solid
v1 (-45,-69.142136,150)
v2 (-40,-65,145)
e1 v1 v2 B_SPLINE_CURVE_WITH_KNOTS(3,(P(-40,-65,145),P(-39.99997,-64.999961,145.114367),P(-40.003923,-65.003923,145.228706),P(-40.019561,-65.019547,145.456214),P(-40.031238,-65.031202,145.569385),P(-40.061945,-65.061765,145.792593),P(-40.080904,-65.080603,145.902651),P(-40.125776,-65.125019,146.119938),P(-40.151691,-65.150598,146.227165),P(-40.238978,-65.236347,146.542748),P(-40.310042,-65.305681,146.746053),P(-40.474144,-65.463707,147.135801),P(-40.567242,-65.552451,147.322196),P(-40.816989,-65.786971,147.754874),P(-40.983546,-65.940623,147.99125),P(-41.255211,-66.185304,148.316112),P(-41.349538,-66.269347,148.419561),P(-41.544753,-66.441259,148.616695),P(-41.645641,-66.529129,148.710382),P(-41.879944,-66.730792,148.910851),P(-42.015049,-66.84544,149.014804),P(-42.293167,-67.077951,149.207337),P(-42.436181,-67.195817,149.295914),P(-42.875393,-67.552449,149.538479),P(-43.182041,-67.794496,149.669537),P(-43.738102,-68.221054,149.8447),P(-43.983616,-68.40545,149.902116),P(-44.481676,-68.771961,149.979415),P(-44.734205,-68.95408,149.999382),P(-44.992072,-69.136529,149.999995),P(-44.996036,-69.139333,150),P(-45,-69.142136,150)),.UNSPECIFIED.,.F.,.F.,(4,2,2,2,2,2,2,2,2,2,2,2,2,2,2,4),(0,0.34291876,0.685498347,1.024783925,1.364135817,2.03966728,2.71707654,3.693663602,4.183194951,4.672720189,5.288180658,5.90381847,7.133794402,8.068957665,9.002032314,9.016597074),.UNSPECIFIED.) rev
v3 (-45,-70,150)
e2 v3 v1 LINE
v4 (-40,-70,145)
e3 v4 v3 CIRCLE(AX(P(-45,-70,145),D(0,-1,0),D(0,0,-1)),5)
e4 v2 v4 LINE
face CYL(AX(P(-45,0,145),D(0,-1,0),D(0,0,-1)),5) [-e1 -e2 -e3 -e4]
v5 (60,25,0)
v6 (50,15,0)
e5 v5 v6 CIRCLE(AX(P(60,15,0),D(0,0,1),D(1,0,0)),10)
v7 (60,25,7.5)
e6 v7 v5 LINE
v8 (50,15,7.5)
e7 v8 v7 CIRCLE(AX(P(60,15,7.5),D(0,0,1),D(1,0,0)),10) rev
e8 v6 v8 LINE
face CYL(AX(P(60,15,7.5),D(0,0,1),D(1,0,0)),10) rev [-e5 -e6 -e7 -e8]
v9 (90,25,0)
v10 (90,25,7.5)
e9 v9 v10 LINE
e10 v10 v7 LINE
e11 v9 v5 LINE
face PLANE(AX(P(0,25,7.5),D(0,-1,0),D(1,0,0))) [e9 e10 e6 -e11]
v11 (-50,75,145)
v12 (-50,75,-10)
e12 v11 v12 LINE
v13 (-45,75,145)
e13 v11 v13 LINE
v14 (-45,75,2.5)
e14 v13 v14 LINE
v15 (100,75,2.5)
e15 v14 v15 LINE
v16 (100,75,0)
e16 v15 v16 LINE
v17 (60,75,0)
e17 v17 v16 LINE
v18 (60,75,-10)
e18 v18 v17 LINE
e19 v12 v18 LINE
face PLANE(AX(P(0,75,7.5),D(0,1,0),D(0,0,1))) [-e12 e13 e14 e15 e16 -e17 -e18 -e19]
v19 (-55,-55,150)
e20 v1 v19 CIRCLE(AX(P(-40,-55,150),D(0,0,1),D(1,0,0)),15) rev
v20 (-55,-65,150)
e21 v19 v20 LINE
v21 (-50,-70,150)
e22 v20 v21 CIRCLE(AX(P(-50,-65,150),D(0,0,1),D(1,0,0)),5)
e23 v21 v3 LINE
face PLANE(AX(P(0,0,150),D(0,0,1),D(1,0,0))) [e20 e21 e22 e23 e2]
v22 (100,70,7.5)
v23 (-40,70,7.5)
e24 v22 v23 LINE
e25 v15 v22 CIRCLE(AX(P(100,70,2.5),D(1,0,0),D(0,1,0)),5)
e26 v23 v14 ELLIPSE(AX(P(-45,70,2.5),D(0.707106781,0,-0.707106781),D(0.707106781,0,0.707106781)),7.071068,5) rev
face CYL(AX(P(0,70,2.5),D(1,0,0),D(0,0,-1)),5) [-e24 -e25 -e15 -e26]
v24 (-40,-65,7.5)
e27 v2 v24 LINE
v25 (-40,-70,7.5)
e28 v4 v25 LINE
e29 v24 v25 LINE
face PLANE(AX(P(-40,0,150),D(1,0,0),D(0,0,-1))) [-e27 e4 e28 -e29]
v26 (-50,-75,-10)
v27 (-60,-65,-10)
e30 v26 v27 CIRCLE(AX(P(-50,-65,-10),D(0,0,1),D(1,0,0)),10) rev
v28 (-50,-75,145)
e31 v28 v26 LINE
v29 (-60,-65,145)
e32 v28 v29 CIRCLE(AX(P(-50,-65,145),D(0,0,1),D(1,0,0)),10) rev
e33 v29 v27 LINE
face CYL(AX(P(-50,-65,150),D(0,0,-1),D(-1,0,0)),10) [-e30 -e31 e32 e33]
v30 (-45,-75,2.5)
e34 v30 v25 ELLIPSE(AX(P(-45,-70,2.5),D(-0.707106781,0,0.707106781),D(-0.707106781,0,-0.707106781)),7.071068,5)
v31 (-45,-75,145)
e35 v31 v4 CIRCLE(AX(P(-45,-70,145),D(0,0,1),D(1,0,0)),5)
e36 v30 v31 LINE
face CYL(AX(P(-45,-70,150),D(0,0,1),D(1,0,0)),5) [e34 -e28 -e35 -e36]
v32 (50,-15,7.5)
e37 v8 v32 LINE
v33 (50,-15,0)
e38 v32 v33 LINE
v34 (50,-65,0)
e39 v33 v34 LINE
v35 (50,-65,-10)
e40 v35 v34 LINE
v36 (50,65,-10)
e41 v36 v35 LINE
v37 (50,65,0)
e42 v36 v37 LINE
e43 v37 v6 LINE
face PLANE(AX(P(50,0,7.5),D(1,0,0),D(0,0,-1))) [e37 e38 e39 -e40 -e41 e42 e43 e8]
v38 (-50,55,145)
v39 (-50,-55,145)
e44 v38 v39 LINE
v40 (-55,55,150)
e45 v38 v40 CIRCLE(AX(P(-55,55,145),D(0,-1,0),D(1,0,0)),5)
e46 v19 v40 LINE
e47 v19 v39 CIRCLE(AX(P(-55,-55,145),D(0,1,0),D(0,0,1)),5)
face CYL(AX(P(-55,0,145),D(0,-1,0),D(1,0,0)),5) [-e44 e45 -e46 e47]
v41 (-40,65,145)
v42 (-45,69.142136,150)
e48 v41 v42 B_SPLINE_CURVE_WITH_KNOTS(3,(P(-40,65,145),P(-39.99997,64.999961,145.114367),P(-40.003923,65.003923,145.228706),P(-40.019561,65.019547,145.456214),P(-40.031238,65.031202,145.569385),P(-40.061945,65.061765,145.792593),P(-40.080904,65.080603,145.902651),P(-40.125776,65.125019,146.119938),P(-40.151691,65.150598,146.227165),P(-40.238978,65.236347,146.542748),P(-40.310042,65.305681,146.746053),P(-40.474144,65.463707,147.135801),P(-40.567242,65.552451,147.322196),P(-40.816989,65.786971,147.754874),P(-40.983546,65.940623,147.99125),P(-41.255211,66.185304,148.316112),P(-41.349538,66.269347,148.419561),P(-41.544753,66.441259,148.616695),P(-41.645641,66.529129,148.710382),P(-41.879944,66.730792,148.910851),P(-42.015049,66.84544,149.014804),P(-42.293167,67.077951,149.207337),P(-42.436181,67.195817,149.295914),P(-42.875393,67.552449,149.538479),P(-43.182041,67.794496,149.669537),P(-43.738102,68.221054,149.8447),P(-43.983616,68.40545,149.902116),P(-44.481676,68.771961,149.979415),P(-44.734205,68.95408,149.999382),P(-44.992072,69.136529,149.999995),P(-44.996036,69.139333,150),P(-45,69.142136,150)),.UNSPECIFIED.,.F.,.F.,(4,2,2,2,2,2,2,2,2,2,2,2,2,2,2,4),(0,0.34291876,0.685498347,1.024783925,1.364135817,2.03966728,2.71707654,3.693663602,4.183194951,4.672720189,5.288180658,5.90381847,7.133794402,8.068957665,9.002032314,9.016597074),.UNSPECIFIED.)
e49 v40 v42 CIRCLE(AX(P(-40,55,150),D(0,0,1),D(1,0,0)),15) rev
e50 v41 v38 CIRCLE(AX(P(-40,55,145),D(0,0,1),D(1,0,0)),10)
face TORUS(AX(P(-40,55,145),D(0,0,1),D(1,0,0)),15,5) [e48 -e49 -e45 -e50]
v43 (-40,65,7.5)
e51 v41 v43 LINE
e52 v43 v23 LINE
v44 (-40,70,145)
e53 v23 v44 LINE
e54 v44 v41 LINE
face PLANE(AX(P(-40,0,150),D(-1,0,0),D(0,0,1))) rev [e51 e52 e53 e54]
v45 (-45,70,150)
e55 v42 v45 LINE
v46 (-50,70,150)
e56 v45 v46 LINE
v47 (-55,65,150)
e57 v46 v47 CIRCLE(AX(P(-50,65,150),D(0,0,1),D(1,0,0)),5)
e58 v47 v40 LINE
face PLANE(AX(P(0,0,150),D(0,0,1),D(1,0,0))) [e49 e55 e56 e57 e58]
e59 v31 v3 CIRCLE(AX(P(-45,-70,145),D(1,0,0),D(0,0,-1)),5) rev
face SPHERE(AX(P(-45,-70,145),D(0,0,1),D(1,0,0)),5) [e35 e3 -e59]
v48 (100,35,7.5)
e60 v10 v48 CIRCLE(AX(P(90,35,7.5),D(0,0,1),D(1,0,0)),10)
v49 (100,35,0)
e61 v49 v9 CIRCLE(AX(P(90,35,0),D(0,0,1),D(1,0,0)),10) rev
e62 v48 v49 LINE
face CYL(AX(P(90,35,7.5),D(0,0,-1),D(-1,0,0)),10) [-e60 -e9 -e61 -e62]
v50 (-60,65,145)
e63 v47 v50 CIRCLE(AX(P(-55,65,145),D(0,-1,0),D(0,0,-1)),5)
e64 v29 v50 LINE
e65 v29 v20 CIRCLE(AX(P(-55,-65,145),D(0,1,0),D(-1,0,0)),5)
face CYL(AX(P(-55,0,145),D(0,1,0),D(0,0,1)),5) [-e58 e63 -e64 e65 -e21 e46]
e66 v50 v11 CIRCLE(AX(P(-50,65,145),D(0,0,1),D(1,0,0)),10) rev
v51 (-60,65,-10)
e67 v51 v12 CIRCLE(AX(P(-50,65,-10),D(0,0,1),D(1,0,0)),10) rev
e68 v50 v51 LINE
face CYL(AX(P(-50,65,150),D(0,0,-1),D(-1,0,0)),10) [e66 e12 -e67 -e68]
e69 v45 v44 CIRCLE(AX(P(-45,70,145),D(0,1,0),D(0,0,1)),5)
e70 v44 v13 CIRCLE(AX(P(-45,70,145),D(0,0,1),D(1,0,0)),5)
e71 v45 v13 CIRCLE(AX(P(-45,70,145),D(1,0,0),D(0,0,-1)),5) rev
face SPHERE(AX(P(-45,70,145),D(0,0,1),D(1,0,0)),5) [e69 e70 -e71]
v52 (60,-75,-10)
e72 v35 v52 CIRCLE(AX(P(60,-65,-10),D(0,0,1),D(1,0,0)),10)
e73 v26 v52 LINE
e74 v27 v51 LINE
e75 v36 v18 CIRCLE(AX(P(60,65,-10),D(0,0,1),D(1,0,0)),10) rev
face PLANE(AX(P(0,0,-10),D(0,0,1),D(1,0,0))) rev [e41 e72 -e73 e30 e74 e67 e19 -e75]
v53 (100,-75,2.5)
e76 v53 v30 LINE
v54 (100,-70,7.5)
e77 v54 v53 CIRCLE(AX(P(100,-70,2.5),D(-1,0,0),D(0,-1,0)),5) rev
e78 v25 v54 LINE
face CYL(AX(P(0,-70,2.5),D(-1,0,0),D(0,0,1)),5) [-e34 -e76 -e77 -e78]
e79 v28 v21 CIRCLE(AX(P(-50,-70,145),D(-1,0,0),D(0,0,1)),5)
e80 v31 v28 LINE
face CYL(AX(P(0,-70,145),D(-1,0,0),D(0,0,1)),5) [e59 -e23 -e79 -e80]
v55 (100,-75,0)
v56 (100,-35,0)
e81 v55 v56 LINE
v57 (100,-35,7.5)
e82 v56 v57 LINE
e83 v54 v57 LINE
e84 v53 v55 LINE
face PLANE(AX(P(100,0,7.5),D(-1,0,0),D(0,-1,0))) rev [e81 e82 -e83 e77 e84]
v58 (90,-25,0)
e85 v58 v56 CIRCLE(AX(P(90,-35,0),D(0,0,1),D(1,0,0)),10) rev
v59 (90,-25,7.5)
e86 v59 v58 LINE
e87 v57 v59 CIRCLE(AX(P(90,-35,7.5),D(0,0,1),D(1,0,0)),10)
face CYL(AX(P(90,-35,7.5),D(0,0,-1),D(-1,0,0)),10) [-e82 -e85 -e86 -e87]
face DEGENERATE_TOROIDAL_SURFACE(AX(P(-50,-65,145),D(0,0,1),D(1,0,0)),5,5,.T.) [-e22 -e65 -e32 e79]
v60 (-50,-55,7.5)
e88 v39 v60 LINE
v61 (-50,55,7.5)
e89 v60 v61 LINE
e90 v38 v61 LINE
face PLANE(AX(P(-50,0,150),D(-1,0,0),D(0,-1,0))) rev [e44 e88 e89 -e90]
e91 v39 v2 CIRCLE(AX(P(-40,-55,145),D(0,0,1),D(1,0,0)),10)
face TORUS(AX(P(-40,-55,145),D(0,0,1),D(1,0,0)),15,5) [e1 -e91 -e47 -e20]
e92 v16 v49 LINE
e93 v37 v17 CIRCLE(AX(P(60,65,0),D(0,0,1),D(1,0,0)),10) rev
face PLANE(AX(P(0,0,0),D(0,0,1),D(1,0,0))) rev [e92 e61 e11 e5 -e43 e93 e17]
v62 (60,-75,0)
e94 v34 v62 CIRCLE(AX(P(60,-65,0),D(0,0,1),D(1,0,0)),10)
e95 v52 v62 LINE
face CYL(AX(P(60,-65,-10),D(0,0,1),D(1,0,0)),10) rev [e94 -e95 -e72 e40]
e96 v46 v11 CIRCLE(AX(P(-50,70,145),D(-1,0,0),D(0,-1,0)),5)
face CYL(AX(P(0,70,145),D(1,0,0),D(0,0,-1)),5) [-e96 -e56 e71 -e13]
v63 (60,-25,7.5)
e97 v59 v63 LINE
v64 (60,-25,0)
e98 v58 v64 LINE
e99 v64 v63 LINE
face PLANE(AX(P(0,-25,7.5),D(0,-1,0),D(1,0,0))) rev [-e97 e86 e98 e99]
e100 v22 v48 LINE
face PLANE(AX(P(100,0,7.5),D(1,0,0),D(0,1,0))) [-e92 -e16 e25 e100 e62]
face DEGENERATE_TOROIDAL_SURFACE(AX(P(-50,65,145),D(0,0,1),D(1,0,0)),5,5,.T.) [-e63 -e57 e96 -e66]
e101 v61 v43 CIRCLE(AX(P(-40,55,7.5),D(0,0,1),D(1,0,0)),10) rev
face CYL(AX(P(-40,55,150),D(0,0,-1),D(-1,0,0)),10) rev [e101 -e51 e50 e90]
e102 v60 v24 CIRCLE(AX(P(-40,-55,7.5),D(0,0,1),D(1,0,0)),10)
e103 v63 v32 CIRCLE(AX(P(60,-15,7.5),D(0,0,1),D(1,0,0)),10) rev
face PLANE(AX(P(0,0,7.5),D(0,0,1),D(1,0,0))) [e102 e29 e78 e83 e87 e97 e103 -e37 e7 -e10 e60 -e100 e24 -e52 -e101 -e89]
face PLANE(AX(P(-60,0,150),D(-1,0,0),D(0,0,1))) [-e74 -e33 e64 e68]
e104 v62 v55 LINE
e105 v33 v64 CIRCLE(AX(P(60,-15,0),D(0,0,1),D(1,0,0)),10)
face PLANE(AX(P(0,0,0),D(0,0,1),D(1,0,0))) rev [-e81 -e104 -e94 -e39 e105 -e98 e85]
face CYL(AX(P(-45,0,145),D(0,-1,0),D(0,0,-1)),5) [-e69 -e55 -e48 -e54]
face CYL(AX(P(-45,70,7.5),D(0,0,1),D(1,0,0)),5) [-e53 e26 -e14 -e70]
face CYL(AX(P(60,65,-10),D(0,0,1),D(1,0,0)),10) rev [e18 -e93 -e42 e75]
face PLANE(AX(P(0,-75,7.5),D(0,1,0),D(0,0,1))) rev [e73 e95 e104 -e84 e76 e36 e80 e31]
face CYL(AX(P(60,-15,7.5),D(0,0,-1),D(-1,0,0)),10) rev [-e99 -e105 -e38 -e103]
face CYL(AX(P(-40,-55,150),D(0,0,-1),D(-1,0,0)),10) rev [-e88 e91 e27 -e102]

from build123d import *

# Parameters (mm, degrees)
BOSS_EXTRUDE1_DEPTH = 7.5
BOSS_EXTRUDE2_DEPTH = 150
BOSS_EXTRUDE3_START = -10
BOSS_EXTRUDE3_DEPTH = 10
FILLET1_R           = 5
FILLET2_R           = 10
FILLET3_R           = 10


with BuildPart() as part:
    # Sketch1 → Boss-Extrude1 (new body)
    with BuildSketch(Plane.XY):
        with BuildLine():
            Line((-40, 75), (-40, 65))
            ThreePointArc((-40, 65), (-47.071067812, 62.071067812), (-50, 55))
            Line((-50, 55), (-50, -55))
            ThreePointArc((-50, -55), (-47.071067812, -62.071067812), (-40, -65))
            Line((-40, -65), (-40, -75))
            Line((-40, -75), (100, -75))
            Line((100, -75), (100, -25))
            Line((100, -25), (50, -25))
            Line((50, -25), (50, 25))
            Line((50, 25), (100, 25))
            Line((100, 25), (100, 75))
            Line((100, 75), (-40, 75))
        make_face()
    extrude(amount=BOSS_EXTRUDE1_DEPTH)

    # Sketch1<5> → Boss-Extrude2 (add)
    with BuildSketch(Plane.XY):
        with BuildLine():
            ThreePointArc((-50, 55), (-47.071067812, 62.071067812), (-40, 65))
            Line((-40, 65), (-40, 75))
            Line((-40, 75), (-50, 75))
            ThreePointArc((-50, 75), (-57.071067812, 72.071067812), (-60, 65))
            Line((-60, 65), (-60, -65))
            ThreePointArc((-60, -65), (-57.071067812, -72.071067812), (-50, -75))
            Line((-50, -75), (-40, -75))
            Line((-40, -75), (-40, -65))
            ThreePointArc((-40, -65), (-47.071067812, -62.071067812), (-50, -55))
            Line((-50, -55), (-50, 55))
        make_face()
    extrude(amount=BOSS_EXTRUDE2_DEPTH)

    # Sketch1<6> → Boss-Extrude3 (add)
    with BuildSketch(Plane.XY.offset(BOSS_EXTRUDE3_START)):
        with BuildLine():
            Line((-50, -75), (60, -75))
            ThreePointArc((60, -75), (52.928932188, -72.071067812), (50, -65))
            Line((50, -65), (50, 65))
            ThreePointArc((50, 65), (52.928932188, 72.071067812), (60, 75))
            Line((60, 75), (-50, 75))
            ThreePointArc((-50, 75), (-57.071067812, 72.071067812), (-60, 65))
            Line((-60, 65), (-60, -65))
            ThreePointArc((-60, -65), (-57.071067812, -72.071067812), (-50, -75))
        make_face()
    extrude(amount=BOSS_EXTRUDE3_DEPTH)

    # Fillet1
    fillet1_edges = [part.edges().sort_by_distance(p)[0] for p in [
        (30, 75, 7.5),
        (-57.071067812, -72.071067812, 150),
        (30, -75, 7.5),
        (-40, -75, 78.75),
        (-40, -70, 150),
        (-47.071067812, -62.071067812, 150),
        (-45, 75, 150),
        (-40, 75, 78.75),
        (-57.071067812, 72.071067812, 150),
        (-60, 0, 150),
        (-45, -75, 150),
        (-50, 0, 150),
        (-47.071067812, 62.071067812, 150),
        (-40, 70, 150),
    ]]
    fillet(fillet1_edges, radius=FILLET1_R - 0.0001)  # a hair under: the kernel refuses the full size

    # Fillet2
    fillet2_edges = [part.edges().sort_by_distance(p)[0] for p in [
        (100, 25, 3.75),
        (100, -25, 3.75),
    ]]
    fillet(fillet2_edges, radius=FILLET2_R)

    # Fillet3
    fillet3_edges = [part.edges().sort_by_distance(p)[0] for p in [
        (50, 25, 3.75),
        (50, -25, 3.75),
    ]]
    fillet(fillet3_edges, radius=FILLET3_R)


solid = part.part
